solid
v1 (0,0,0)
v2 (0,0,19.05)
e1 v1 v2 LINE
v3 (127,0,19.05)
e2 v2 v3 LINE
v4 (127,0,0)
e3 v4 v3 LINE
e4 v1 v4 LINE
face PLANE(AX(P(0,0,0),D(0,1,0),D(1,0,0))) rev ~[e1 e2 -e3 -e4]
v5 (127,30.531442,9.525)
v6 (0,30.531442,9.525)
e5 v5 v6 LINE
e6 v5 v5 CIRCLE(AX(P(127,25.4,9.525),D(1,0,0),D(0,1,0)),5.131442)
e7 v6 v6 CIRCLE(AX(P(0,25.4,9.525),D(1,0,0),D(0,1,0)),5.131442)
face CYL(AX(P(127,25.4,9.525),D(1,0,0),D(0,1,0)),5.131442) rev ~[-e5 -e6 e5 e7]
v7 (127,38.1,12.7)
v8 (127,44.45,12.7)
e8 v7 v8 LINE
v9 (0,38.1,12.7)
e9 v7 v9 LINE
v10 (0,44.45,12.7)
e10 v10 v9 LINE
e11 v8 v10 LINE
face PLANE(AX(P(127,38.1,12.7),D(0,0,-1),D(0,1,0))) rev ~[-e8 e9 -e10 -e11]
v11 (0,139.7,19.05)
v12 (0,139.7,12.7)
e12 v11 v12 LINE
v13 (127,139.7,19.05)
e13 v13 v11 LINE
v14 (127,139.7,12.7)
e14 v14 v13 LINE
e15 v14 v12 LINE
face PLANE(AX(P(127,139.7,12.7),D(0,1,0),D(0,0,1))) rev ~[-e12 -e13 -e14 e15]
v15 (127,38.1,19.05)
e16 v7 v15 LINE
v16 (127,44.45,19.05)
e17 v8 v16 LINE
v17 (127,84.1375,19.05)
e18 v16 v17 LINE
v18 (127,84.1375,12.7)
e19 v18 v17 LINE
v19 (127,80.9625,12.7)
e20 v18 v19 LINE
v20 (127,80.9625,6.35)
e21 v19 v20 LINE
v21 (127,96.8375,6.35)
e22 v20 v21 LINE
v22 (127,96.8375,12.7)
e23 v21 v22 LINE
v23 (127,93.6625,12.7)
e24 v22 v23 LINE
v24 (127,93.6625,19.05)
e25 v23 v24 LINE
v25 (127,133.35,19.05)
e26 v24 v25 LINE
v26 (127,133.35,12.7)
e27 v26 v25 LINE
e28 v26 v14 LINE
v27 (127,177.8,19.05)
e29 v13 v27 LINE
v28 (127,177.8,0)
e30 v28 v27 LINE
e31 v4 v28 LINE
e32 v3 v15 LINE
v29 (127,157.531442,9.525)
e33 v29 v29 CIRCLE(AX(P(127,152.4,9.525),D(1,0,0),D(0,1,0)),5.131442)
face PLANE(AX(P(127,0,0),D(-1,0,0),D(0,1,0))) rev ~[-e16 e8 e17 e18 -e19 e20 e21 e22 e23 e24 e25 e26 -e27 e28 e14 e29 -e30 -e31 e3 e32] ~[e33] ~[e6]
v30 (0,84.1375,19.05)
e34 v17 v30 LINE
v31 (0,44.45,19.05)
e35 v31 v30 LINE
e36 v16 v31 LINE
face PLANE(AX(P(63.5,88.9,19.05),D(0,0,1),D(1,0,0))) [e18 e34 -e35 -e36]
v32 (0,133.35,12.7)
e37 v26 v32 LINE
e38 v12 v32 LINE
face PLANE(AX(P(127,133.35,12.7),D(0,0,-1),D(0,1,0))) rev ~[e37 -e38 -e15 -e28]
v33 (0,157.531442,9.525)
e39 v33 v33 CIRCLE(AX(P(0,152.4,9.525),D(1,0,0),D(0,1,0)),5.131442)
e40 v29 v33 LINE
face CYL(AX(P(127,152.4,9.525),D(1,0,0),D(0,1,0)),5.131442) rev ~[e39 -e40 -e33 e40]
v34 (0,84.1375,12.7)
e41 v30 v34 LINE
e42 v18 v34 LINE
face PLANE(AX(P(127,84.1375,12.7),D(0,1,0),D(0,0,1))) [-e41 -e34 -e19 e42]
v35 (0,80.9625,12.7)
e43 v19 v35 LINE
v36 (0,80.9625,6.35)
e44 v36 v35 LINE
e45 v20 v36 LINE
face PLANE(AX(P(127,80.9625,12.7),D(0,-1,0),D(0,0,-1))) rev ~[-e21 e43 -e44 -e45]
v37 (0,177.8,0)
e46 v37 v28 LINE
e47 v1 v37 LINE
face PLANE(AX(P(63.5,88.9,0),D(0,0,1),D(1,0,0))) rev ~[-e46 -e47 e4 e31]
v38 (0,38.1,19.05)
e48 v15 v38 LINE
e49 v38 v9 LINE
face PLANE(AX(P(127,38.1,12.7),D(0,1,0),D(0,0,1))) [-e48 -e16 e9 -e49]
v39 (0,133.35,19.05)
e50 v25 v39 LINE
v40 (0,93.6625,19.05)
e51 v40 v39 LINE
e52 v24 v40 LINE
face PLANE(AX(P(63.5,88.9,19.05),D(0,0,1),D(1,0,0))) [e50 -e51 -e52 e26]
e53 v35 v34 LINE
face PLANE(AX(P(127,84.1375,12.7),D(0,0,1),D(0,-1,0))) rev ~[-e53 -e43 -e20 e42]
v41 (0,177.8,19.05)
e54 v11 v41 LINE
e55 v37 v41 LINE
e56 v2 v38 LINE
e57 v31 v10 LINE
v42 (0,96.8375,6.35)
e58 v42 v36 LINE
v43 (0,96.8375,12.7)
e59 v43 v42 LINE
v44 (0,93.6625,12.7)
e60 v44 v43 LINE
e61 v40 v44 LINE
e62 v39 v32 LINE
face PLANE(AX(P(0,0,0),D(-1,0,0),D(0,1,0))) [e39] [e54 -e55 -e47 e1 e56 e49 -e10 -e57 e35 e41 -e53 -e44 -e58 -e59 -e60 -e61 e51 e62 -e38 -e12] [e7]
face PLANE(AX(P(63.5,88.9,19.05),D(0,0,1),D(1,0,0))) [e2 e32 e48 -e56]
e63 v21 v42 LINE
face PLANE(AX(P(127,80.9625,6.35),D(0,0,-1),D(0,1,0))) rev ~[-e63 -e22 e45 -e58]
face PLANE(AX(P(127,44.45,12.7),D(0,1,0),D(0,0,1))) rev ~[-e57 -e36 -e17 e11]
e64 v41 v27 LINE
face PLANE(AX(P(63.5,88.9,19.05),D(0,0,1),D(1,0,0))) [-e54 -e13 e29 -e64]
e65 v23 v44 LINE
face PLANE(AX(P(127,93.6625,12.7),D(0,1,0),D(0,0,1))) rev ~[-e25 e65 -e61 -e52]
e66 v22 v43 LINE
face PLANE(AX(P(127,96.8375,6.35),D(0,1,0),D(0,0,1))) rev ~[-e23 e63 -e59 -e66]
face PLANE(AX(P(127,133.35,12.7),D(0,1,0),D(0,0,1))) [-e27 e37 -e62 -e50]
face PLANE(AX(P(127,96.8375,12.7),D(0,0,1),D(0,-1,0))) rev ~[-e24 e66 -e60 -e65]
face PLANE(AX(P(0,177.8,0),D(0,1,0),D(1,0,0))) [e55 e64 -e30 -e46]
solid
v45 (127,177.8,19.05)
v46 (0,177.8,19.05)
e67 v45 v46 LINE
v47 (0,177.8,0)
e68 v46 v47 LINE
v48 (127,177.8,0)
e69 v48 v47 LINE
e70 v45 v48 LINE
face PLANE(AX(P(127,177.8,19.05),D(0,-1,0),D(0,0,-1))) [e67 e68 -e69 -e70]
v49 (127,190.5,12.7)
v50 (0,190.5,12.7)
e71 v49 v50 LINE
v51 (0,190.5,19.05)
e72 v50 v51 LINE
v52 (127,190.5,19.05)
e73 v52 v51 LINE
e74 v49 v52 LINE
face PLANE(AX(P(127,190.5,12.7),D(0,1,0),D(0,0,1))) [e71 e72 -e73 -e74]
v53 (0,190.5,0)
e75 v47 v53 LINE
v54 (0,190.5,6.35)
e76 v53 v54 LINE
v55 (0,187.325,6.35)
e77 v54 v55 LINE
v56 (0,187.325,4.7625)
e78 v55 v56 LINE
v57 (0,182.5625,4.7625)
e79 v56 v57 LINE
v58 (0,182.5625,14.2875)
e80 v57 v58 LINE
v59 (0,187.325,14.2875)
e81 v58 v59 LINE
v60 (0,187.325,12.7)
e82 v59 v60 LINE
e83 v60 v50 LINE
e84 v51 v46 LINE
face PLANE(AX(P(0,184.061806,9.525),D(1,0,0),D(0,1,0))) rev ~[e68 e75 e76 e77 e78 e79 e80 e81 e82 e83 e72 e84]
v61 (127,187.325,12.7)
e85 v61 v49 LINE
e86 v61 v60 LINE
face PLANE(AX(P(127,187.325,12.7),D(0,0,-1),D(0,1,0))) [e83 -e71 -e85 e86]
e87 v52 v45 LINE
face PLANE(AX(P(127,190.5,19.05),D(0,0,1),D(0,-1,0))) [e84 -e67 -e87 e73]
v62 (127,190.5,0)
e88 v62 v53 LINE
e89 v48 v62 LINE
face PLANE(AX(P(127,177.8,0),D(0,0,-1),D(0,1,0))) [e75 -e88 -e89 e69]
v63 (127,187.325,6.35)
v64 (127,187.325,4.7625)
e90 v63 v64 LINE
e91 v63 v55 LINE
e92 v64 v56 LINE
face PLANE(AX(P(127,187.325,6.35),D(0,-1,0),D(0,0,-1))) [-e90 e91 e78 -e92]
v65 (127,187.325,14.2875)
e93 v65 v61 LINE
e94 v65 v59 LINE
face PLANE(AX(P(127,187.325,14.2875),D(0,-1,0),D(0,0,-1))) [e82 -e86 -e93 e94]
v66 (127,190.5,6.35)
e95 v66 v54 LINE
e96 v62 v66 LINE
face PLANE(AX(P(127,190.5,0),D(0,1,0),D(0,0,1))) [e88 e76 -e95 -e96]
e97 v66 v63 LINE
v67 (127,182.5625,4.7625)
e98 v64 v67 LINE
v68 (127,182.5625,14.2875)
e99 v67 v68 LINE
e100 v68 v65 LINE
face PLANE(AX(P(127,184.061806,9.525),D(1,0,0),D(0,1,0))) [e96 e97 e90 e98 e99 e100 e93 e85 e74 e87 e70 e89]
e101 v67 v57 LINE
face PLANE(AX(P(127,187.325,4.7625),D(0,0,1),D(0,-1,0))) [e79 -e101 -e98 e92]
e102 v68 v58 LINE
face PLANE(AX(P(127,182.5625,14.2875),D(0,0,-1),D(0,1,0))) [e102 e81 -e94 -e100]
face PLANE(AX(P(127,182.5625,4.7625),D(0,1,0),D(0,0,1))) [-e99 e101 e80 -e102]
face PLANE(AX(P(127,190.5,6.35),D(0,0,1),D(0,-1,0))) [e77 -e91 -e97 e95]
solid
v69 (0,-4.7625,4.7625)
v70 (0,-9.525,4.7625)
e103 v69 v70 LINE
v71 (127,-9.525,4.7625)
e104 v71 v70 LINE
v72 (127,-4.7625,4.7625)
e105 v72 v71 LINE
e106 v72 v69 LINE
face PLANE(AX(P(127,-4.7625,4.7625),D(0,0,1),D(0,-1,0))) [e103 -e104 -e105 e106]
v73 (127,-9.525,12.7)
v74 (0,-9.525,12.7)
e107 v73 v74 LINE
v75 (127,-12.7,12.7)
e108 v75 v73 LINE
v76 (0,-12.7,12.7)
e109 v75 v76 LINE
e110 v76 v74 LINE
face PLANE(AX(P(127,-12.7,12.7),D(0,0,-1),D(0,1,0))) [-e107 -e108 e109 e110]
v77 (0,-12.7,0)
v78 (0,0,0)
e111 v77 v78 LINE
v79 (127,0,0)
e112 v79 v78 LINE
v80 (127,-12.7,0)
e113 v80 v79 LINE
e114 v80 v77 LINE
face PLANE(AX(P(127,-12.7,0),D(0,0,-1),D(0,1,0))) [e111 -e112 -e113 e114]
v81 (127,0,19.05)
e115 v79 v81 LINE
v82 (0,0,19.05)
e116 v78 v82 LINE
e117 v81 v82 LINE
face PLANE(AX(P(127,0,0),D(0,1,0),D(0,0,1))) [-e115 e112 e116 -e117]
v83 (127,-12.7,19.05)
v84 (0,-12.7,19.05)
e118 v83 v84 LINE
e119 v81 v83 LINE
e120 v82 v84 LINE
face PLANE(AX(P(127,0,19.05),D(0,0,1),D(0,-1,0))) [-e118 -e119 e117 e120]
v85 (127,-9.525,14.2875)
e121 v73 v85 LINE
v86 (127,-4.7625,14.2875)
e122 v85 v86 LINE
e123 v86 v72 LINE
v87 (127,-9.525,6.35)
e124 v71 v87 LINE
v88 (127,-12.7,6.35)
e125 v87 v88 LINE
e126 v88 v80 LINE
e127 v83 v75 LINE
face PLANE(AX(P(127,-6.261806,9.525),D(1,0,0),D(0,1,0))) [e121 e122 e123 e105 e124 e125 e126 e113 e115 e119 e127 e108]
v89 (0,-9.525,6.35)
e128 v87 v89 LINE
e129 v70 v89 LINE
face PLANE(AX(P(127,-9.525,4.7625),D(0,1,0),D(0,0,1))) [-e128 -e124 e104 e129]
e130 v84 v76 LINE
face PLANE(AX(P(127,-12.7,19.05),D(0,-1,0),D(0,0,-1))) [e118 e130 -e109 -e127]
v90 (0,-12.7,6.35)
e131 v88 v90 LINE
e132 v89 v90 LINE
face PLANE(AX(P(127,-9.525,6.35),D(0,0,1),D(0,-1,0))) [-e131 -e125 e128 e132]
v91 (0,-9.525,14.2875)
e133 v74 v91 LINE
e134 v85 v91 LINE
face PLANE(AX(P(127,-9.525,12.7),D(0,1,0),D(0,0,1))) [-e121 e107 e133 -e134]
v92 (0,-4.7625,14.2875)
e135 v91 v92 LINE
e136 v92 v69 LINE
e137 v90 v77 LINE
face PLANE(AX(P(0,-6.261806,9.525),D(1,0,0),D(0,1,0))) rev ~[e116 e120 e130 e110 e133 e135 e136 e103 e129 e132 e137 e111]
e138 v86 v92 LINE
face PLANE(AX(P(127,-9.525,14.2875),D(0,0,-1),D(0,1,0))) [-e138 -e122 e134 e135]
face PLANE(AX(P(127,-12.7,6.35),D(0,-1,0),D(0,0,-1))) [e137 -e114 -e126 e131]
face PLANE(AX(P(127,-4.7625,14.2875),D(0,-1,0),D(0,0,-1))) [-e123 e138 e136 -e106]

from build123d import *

# Parameters (mm, degrees)
F0_W     = 127
F0_H     = 177.8
F1_DEPTH = 19.05
F2_W     = 6.35
F2_H     = 6.35
F2_W_2   = 9.525
F2_R     = 5.1314415813
F3_DEPTH = 127.001
F5_DEPTH = 127


# Not quite as in the source:
# - a feature names something its author has since deleted; it is built from what else it names


with BuildPart() as f1:
    # F0 (on Top) → F1 (new body)
    with BuildSketch(Plane.XY):
        with Locations((63.5, 88.9)):
            Rectangle(F0_W, F0_H)
    extrude(amount=F1_DEPTH)

    # F2 (on face) → F3 (cut, through all)
    with BuildSketch(Plane.YZ.offset(127)):
        with Locations((41.275, 15.875)):
            Rectangle(F2_W, F2_H)
        with Locations((88.9, 15.875)):
            Rectangle(F2_W_2, F2_H)
        Polygon((93.6625, 12.7), (84.1375, 12.7), (80.9625, 12.7), (80.9625, 6.35), (96.8375, 6.35), (96.8375, 12.7), align=None)
        with Locations((25.4, 9.525)):
            Circle(F2_R)
        with Locations((152.4, 9.525)):
            Circle(F2_R)
        with Locations((136.525, 15.875)):
            Rectangle(F2_W, F2_H)
    extrude(amount=-F3_DEPTH, mode=Mode.SUBTRACT)


with BuildPart() as f5:
    # F4 (on face) → F5 (new body, through all)
    with BuildSketch(Plane.YZ.offset(127)):
        Polygon((0, 0), (0, 19.05), (-12.7, 19.05), (-12.7, 12.7), (-9.525, 12.7), (-9.525, 14.2875), (-4.7625, 14.2875), (-4.7625, 4.7625), (-9.525, 4.7625), (-9.525, 6.35), (-12.7, 6.35), (-12.7, 0), align=None)
    extrude(amount=-F5_DEPTH)


with BuildPart() as f5b:
    # F4 (on face) → F5, piece 2 (new body, through all)
    with BuildSketch(Plane.YZ.offset(127)):
        Polygon((177.8, 19.05), (177.8, 0), (190.5, 0), (190.5, 6.35), (187.325, 6.35), (187.325, 4.7625), (182.5625, 4.7625), (182.5625, 14.2875), (187.325, 14.2875), (187.325, 12.7), (190.5, 12.7), (190.5, 19.05), align=None)
    extrude(amount=-F5_DEPTH)


solid = Compound([f1.part, f5.part, f5b.part])
